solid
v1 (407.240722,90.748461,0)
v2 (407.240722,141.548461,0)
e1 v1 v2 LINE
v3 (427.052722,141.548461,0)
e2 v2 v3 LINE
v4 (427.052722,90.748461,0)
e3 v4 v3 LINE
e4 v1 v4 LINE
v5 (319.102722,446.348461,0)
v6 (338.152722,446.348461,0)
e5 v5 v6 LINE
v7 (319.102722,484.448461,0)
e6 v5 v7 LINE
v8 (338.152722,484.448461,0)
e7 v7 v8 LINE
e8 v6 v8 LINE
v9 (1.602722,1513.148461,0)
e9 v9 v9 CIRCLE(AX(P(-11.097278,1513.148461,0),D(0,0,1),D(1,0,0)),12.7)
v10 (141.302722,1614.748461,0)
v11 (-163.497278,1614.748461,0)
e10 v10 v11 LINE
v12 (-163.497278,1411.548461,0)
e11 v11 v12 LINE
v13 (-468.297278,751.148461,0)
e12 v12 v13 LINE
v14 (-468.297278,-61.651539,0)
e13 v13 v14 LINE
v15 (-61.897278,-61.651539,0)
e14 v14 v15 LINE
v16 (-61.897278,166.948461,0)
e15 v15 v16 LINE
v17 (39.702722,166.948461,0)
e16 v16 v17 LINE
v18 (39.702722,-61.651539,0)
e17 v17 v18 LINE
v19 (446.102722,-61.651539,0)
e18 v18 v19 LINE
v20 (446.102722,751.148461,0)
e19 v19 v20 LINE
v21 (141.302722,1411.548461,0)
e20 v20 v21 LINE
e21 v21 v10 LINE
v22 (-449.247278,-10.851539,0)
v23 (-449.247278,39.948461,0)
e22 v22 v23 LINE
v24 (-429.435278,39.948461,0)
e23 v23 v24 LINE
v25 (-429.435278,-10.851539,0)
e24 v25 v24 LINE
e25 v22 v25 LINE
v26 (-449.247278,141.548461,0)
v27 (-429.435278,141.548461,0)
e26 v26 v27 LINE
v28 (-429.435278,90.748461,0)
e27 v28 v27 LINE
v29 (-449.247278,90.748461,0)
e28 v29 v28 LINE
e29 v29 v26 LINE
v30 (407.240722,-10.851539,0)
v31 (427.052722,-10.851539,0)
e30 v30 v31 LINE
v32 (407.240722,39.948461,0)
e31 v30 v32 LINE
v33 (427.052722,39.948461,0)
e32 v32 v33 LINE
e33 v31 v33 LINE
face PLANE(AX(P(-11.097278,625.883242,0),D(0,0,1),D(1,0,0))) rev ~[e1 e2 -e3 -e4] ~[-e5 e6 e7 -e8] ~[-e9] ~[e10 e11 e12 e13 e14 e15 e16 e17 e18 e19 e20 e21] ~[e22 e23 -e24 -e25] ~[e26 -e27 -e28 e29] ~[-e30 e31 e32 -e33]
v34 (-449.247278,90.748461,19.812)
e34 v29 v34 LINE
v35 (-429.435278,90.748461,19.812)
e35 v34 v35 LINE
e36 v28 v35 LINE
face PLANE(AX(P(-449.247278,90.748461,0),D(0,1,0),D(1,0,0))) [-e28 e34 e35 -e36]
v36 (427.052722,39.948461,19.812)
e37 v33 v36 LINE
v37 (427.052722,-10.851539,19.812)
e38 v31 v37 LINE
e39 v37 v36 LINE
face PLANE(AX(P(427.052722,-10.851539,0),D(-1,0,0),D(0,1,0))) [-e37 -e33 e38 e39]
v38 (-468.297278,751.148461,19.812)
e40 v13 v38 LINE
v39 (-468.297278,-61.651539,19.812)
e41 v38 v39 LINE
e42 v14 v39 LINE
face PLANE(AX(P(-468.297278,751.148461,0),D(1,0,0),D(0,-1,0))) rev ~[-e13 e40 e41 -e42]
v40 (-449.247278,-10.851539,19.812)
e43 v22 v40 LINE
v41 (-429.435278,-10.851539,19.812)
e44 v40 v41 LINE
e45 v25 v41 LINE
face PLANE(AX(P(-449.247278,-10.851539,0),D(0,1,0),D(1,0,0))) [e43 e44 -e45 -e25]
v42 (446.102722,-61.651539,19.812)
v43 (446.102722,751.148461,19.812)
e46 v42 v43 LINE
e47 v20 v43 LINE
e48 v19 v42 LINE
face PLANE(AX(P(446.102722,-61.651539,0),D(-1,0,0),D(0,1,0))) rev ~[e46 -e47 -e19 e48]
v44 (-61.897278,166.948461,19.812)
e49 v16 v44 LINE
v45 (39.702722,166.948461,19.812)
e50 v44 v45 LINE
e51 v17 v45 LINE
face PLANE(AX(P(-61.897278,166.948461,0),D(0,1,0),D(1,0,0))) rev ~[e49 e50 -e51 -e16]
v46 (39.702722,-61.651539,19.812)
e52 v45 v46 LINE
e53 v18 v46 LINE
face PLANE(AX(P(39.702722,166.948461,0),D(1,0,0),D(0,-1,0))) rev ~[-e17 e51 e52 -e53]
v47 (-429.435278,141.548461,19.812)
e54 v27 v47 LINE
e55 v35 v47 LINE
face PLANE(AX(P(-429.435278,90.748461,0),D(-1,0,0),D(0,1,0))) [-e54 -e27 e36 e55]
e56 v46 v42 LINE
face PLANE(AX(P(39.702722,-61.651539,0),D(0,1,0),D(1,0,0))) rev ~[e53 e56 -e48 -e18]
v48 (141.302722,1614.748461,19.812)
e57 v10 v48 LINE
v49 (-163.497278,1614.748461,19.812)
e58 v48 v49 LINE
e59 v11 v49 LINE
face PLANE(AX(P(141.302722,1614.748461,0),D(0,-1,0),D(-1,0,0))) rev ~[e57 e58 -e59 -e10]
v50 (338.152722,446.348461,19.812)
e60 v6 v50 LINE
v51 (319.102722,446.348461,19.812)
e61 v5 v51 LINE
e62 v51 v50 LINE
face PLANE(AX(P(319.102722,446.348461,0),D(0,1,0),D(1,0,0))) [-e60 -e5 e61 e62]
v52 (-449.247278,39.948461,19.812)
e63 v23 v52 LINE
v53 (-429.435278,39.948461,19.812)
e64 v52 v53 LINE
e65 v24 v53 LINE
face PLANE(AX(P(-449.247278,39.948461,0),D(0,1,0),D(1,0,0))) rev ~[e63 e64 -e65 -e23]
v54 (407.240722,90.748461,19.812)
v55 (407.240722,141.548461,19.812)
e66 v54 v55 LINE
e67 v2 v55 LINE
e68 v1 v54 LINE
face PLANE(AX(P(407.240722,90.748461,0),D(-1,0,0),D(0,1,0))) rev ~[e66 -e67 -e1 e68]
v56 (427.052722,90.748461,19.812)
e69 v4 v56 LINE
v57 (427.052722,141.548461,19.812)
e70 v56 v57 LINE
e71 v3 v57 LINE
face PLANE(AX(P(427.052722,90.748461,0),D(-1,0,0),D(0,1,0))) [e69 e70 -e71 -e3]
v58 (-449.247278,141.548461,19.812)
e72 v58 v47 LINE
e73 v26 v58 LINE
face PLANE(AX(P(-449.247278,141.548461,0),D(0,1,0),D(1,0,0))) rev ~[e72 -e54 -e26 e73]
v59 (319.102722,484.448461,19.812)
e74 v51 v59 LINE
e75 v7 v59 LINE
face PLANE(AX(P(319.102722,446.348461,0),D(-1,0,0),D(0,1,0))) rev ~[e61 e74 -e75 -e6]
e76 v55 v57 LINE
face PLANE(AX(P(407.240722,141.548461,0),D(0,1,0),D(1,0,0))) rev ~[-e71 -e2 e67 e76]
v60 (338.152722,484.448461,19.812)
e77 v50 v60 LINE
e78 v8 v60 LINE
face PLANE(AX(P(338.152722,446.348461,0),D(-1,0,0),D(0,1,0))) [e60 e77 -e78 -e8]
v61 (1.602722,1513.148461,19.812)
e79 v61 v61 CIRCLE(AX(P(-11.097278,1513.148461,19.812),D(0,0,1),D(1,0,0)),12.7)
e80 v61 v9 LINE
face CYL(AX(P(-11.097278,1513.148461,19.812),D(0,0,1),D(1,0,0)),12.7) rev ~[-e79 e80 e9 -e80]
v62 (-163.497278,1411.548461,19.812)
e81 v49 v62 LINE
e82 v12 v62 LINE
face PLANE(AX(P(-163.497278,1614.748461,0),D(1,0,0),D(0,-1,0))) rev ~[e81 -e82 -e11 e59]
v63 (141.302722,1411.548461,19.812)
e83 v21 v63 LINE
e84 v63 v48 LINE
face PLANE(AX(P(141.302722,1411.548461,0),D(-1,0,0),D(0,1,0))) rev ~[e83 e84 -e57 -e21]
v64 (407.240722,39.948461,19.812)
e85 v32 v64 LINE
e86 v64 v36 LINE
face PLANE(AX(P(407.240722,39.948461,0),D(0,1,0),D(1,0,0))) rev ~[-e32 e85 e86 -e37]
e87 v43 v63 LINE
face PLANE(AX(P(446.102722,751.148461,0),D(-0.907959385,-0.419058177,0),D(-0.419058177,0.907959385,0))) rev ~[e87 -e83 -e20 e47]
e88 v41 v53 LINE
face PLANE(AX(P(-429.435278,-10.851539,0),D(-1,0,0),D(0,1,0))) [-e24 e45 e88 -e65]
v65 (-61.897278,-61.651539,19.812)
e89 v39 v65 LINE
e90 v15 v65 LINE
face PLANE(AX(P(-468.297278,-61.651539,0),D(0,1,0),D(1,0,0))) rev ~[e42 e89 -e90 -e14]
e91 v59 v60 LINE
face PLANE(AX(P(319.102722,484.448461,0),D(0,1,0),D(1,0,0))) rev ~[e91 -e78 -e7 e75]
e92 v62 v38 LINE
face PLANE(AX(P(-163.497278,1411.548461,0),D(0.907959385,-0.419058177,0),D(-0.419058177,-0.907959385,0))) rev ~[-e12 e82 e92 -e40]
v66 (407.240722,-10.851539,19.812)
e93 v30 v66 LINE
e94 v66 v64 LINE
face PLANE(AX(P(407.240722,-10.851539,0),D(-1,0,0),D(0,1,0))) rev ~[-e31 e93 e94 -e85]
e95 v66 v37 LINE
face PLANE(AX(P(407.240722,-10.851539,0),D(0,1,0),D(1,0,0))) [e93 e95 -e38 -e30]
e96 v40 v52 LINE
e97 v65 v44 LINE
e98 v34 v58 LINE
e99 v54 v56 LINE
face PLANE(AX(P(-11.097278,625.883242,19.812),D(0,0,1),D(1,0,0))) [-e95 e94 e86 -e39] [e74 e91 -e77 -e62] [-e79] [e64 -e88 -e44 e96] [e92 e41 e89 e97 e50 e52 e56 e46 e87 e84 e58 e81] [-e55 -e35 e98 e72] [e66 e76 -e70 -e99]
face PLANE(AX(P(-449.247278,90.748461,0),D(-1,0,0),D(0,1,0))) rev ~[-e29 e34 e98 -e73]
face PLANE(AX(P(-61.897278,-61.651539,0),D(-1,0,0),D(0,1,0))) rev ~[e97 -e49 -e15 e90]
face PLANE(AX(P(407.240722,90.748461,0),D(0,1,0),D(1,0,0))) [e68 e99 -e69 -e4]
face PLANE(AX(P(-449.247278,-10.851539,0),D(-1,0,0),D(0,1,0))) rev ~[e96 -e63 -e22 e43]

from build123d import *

# Parameters (mm, degrees)
F0_W     = 19.812
F0_H     = 50.8
F0_W_2   = 19.05
F0_H_2   = 38.1
F1_DEPTH = 19.812
F2_R     = 12.7
F3_DEPTH = 254


# Not quite as in the source:
# - a feature names something its author has since deleted; it is built from what else it names


with BuildPart() as f1:
    # F0 (on Top) → F1 (new body)
    with BuildSketch(Plane.XY):
        Polygon((-468.2972775146, 751.1484609425), (-468.2972775146, -61.6515390575), (-61.8972775146, -61.6515390575), (-61.8972775146, 166.9484609425), (39.7027224854, 166.9484609425), (39.7027224854, -61.6515390575), (446.1027224854, -61.6515390575), (446.1027224854, 751.1484609425), (141.3027224854, 1411.5484609425), (141.3027224854, 1614.7484609425), (-11.0972775146, 1614.7484609425), (-163.4972775146, 1614.7484609425), (-163.4972775146, 1411.5484609425), align=None)
        with Locations((-439.3412775146, 14.5484609425)):
            Rectangle(F0_W, F0_H, mode=Mode.SUBTRACT)
        with Locations((-439.3412775146, 116.1484609425)):
            Rectangle(F0_W, F0_H, mode=Mode.SUBTRACT)
        with Locations((417.1467224854, 14.5484609425)):
            Rectangle(F0_W, F0_H, mode=Mode.SUBTRACT)
        with Locations((417.1467224854, 116.1484609425)):
            Rectangle(F0_W, F0_H, mode=Mode.SUBTRACT)
        with Locations((328.6277224854, 465.3984609425)):
            Rectangle(F0_W_2, F0_H_2, mode=Mode.SUBTRACT)
    extrude(amount=F1_DEPTH)

    # F2 (on face) → F3 (cut)
    with BuildSketch(Plane.XY.offset(19.812)):
        with Locations((-11.0972775146, 1513.1484609425)):
            Circle(F2_R)
    extrude(amount=-F3_DEPTH, mode=Mode.SUBTRACT)


solid = f1.part
